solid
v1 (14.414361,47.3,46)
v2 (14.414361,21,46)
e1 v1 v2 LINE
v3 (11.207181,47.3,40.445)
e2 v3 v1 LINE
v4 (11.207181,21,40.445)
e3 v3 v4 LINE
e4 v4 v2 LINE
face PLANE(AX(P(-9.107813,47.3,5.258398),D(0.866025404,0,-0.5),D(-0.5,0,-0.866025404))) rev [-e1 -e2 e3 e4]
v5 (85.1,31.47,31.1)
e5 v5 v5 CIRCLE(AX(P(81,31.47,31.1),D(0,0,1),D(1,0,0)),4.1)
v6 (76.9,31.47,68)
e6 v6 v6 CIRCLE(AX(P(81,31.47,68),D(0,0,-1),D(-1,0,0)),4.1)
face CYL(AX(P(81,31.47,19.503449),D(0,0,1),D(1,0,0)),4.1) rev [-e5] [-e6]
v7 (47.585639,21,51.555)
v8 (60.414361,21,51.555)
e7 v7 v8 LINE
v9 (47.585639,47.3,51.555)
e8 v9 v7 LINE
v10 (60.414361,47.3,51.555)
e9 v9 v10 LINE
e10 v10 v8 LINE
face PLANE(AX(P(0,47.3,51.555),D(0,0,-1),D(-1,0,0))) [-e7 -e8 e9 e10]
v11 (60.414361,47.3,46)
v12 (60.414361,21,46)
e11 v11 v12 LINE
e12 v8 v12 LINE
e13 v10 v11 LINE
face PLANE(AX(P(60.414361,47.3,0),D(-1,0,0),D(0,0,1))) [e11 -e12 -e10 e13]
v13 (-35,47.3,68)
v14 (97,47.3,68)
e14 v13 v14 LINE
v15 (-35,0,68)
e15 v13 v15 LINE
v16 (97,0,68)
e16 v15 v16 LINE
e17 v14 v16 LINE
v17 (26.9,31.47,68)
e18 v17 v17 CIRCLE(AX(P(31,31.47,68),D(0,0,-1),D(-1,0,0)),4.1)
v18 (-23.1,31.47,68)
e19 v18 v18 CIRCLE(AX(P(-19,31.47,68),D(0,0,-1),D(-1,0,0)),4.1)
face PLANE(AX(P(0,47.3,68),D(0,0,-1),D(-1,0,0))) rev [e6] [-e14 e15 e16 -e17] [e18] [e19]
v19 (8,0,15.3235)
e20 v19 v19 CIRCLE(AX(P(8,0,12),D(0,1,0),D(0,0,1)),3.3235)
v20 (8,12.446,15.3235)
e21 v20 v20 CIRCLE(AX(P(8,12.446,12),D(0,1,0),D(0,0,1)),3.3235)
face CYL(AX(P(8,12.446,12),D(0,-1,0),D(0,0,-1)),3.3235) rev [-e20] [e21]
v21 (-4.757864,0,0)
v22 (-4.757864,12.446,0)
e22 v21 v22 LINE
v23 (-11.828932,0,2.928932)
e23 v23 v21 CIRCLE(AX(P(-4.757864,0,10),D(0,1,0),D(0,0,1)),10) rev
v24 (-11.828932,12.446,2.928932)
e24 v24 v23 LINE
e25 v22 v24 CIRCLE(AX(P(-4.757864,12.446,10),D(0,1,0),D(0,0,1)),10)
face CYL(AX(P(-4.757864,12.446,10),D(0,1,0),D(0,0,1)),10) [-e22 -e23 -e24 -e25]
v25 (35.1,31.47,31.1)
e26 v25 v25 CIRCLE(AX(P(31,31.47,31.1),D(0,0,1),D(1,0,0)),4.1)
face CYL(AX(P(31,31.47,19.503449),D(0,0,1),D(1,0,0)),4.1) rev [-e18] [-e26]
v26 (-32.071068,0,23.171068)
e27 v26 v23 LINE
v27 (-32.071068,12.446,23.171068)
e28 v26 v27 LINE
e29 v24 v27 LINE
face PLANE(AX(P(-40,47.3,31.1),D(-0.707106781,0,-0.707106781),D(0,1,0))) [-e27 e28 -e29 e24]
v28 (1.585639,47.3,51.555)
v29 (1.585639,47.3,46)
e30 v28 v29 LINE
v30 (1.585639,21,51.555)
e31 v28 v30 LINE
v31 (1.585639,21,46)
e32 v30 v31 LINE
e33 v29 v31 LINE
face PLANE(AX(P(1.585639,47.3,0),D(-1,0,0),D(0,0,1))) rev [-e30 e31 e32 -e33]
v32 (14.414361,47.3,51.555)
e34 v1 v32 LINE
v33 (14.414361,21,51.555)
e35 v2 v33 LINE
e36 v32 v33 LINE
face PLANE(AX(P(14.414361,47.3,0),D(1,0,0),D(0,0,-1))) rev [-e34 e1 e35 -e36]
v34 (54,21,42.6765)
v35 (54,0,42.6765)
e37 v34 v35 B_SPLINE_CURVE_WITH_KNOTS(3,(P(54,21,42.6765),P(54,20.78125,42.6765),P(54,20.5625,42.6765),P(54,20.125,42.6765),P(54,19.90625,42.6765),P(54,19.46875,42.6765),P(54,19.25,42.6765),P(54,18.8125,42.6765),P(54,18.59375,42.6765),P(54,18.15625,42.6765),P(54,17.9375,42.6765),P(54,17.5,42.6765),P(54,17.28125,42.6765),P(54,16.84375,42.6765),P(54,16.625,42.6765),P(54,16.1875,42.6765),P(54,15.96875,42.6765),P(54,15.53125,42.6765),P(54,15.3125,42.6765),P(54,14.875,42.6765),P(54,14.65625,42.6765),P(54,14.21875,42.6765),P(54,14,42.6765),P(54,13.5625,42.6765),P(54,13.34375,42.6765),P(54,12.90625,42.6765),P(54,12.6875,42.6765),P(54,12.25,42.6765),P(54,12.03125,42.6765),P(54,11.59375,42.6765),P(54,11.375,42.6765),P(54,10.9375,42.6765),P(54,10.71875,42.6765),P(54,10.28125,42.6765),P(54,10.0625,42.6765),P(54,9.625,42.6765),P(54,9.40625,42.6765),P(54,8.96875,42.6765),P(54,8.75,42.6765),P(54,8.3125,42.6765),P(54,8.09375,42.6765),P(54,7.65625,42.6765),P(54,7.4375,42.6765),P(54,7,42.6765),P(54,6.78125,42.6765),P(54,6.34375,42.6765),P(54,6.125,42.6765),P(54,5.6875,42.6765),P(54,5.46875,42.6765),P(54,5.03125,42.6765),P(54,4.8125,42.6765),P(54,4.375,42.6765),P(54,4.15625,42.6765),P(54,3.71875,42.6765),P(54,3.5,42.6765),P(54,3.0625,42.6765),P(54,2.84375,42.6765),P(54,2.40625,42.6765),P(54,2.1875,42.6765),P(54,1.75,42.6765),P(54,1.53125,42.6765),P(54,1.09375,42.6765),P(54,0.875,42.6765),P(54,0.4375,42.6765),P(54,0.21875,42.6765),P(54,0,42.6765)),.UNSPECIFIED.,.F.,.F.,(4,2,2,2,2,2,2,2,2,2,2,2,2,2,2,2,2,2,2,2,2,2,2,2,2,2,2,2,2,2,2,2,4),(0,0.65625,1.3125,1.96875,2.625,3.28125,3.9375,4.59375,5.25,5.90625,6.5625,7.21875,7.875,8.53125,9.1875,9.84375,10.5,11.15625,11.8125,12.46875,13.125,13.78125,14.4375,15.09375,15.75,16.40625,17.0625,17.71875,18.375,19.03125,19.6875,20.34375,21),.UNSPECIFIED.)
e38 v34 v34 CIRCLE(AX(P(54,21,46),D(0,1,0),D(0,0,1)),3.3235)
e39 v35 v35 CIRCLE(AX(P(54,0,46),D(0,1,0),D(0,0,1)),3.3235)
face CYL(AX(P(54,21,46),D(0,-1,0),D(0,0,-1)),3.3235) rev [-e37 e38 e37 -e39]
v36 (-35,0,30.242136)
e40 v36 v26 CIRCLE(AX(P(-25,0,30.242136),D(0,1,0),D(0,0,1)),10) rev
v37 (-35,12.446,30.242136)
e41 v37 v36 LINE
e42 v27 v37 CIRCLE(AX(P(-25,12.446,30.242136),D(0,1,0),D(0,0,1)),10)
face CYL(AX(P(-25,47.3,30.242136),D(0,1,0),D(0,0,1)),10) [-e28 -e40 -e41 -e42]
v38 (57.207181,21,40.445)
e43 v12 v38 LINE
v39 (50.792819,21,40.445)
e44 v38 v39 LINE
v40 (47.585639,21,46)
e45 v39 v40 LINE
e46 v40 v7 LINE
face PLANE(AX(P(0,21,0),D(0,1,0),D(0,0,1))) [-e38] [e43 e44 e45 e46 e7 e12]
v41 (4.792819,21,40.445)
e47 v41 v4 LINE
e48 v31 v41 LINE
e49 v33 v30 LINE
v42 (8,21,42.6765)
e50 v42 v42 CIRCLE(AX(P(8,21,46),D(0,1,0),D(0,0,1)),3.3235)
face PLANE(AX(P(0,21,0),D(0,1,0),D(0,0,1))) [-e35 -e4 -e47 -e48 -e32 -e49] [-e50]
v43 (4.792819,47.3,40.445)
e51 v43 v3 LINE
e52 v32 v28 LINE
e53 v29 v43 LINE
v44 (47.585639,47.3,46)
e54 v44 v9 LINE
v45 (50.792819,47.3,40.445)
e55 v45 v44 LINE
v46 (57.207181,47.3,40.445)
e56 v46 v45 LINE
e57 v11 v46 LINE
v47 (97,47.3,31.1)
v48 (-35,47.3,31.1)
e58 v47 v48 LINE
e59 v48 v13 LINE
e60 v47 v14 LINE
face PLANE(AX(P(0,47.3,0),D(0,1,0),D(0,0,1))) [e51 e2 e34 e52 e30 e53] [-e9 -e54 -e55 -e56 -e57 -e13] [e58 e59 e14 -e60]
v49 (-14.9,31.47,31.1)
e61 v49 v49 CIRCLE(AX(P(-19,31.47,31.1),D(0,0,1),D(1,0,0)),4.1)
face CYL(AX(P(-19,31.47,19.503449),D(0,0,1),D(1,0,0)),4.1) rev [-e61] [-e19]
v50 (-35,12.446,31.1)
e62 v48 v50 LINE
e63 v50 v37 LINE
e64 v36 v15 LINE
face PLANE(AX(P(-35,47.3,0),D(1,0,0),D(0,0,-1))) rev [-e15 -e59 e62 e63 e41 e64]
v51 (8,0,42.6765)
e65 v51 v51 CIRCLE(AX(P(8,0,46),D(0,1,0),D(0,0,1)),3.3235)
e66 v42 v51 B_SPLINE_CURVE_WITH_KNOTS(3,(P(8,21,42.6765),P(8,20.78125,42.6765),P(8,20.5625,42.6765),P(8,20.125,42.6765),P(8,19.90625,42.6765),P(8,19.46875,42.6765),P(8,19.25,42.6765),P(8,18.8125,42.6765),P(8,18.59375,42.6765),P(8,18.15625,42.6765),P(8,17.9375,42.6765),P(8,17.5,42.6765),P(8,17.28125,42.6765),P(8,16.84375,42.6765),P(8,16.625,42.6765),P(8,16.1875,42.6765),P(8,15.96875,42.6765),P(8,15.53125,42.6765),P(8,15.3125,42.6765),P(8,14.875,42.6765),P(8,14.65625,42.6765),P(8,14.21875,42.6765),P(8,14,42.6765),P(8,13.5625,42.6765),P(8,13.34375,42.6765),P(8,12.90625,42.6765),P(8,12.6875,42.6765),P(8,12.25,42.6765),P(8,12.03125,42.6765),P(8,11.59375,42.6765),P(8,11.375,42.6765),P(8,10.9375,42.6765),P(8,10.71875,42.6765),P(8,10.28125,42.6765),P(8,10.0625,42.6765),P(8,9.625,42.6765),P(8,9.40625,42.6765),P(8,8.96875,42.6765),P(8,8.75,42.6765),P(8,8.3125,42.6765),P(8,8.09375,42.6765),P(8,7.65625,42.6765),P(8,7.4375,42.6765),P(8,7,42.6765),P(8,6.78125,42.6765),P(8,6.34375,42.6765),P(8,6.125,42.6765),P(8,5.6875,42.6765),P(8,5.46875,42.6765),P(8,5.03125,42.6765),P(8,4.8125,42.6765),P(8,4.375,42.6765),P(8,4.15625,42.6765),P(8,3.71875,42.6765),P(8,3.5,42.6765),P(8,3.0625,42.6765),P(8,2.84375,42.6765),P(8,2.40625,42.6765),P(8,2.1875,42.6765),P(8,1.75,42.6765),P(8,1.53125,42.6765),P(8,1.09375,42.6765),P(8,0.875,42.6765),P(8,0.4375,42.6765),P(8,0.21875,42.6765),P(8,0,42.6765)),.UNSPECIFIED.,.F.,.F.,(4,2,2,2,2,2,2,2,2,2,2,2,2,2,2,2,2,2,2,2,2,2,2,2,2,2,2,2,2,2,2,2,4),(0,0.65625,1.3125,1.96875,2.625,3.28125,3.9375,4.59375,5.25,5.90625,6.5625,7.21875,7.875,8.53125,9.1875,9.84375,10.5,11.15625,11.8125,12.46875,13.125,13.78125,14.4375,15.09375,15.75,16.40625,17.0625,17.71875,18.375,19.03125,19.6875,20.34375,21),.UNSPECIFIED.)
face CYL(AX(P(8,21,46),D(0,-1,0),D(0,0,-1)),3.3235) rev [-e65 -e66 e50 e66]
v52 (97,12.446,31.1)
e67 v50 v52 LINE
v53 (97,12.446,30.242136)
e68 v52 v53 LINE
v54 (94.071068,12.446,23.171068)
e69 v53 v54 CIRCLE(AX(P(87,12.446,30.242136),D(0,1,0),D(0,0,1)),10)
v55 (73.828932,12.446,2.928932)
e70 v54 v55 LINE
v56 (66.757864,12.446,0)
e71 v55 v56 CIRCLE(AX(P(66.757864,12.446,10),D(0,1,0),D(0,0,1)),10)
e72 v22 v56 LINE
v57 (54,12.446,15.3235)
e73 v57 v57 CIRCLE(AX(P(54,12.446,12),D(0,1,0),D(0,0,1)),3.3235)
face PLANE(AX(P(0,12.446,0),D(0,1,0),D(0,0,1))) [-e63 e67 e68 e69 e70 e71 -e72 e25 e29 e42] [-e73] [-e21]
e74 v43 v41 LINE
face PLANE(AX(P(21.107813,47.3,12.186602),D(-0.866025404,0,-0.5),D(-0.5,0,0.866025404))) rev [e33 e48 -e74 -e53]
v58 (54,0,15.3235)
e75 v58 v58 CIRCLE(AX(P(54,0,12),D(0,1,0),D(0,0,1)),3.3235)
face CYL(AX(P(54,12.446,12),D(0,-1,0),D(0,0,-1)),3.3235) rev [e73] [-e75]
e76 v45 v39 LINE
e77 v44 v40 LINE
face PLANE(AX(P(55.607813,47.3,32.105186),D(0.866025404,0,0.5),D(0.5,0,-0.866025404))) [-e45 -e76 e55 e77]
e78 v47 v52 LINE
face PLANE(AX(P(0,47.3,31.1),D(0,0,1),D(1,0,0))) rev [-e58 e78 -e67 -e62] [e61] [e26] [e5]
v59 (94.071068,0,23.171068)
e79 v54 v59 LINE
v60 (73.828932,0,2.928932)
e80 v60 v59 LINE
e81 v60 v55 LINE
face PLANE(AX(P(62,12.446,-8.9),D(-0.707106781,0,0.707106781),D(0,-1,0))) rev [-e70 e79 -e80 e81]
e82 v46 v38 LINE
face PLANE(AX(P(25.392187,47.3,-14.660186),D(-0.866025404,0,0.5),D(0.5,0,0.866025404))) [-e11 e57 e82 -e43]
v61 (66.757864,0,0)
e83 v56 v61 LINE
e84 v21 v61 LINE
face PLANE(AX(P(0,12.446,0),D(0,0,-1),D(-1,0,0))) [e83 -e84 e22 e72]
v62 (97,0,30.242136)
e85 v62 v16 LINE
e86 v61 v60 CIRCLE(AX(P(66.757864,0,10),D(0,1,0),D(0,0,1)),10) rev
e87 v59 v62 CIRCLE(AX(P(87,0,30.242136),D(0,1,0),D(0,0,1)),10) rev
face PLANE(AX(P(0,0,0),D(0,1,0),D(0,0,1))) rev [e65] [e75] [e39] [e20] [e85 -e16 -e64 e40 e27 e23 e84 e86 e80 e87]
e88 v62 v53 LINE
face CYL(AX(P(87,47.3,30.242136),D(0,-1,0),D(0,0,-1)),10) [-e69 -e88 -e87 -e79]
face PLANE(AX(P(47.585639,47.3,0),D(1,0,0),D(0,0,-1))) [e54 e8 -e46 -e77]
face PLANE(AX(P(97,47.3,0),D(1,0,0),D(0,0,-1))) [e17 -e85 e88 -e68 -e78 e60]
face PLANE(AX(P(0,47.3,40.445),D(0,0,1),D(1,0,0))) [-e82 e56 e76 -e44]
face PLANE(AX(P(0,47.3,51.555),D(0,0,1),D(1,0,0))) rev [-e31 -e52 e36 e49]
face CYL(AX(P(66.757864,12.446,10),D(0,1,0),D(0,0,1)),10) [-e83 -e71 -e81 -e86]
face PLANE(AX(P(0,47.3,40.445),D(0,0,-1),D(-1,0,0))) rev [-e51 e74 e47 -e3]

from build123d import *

# Parameters (mm, degrees)
SKETCH1_W           = 62
SKETCH1_H           = 31.1
SKETCH1_R           = 3.3235
BOSS_EXTRUDE1_DEPTH = 12.446
SKETCH1_3_W         = 35
SKETCH1_3_H         = 36.9
SKETCH1_3_W_2       = 62
BOSS_EXTRUDE2_DEPTH = 47.3
SKETCH1_4_R         = 3.3235
BOSS_EXTRUDE3_DEPTH = 21
SKETCH2_R           = 4.1
CUT_EXTRUDE1_DEPTH  = 36.9
CHAMFER1_SIZE       = 40
FILLET3_R           = 10


with BuildPart() as part:
    # Sketch1 → Boss-Extrude1 (new body)
    with BuildSketch(Plane(origin=(0, 0, 0), x_dir=(1, 0, 0), z_dir=(0, 1, 0))):
        with Locations((31, -15.55)):
            Rectangle(SKETCH1_W, SKETCH1_H)
        with Locations(Location((8, -12, 0), (0, 0, 270))):
            Circle(SKETCH1_R, mode=Mode.SUBTRACT)
        with Locations(Location((54, -12, 0), (0, 0, 270))):
            Circle(SKETCH1_R, mode=Mode.SUBTRACT)
    extrude(amount=BOSS_EXTRUDE1_DEPTH)

    # Sketch1<3> → Boss-Extrude2 (add)
    # profile 1 of 3: a face of its own
    with BuildSketch(Plane(origin=(0, 0, 0), x_dir=(1, 0, 0), z_dir=(0, 1, 0))):
        with Locations((-17.5, -49.55)):
            Rectangle(SKETCH1_3_W, SKETCH1_3_H)
    # profile 2 of 3: a face of its own
    with BuildSketch(Plane(origin=(0, 0, 0), x_dir=(1, 0, 0), z_dir=(0, 1, 0))):
        with Locations((31, -49.55)):
            Rectangle(SKETCH1_3_W_2, SKETCH1_3_H)
        Polygon((1.585638509, -46), (4.792819255, -40.445), (11.207180745, -40.445), (14.414361491, -46), (14.414361491, -51.555), (11.207180745, -51.555), (4.792819255, -51.555), (1.585638509, -51.555), align=None, mode=Mode.SUBTRACT)
        Polygon((60.414361491, -46), (60.414361491, -51.555), (47.585638509, -51.555), (47.585638509, -46), (50.792819255, -40.445), (57.207180745, -40.445), align=None, mode=Mode.SUBTRACT)
    # profile 3 of 3: a face of its own
    with BuildSketch(Plane(origin=(0, 0, 0), x_dir=(1, 0, 0), z_dir=(0, 1, 0))):
        with Locations((79.5, -49.55)):
            Rectangle(SKETCH1_3_W, SKETCH1_3_H)
    extrude(amount=BOSS_EXTRUDE2_DEPTH)

    # Sketch1<4> → Boss-Extrude3 (add)
    # profile 1 of 2: a face of its own
    with BuildSketch(Plane(origin=(0, 0, 0), x_dir=(1, 0, 0), z_dir=(0, 1, 0))):
        Polygon((14.414361491, -46), (11.207180745, -40.445), (4.792819255, -40.445), (1.585638509, -46), (1.585638509, -51.555), (14.414361491, -51.555), align=None)
        with Locations(Location((8, -46, 0), (0, 0, 90))):
            Circle(SKETCH1_4_R, mode=Mode.SUBTRACT)
    # profile 2 of 2: a face of its own
    with BuildSketch(Plane(origin=(0, 0, 0), x_dir=(1, 0, 0), z_dir=(0, 1, 0))):
        Polygon((47.585638509, -51.555), (60.414361491, -51.555), (60.414361491, -46), (57.207180745, -40.445), (50.792819255, -40.445), (47.585638509, -46), align=None)
        with Locations(Location((54, -46, 0), (0, 0, 90))):
            Circle(SKETCH1_4_R, mode=Mode.SUBTRACT)
    extrude(amount=BOSS_EXTRUDE3_DEPTH)

    # Sketch2 → Cut-Extrude1 (cut)
    with BuildSketch(Plane(origin=(0, 0, 68), x_dir=(-1, 0, 0), z_dir=(0, 0, -1))):
        with Locations(Location((19, 31.47, 0), (0, 0, 180))):
            Circle(SKETCH2_R)
        with Locations(Location((-31, 31.47, 0), (0, 0, 180))):
            Circle(SKETCH2_R)
        with Locations(Location((-81, 31.47, 0), (0, 0, 180))):
            Circle(SKETCH2_R)
    extrude(amount=CUT_EXTRUDE1_DEPTH, mode=Mode.SUBTRACT)

    # Chamfer1
    # the kernel refuses this chamfer: 40 mm, written as the material it adds along each edge
    with BuildSketch(Plane(origin=(62, 0, 31.1), x_dir=(0.9996219169112968, 0, 0.02749587661058649), z_dir=(0, 1, 0))) as chamfer1_piece_1_section:
        Polygon((CHAMFER1_SIZE * 0.999621916911, CHAMFER1_SIZE * 0.0274958766106), (-CHAMFER1_SIZE * 0.0274958766106, CHAMFER1_SIZE * 0.999621916911), (0, 0), align=None)
    chamfer1_piece_1 = extrude(amount=12.446, mode=Mode.PRIVATE)
    chamfer1_piece_1 = split(chamfer1_piece_1, bisect_by=Plane(origin=(97, 6.223, 19.019433431), z_dir=(-1, 0, 0)), keep=Keep.TOP, mode=Mode.PRIVATE)
    chamfer1_piece_1 = split(chamfer1_piece_1, bisect_by=Plane(origin=(75.290949727, 6.223, 0), z_dir=(0, 0, 1)), keep=Keep.TOP, mode=Mode.PRIVATE)
    add(chamfer1_piece_1)
    with BuildSketch(Plane(origin=(0, 0, 31.1), x_dir=(-0.9996219169112968, 0, 0.027495876610586497), z_dir=(0, 1, 0))) as chamfer1_piece_2_section:
        Polygon((CHAMFER1_SIZE * 0.999621916911, -CHAMFER1_SIZE * 0.0274958766106), (-CHAMFER1_SIZE * 0.0274958766106, -CHAMFER1_SIZE * 0.999621916911), (0, 0), align=None)
    chamfer1_piece_2 = extrude(amount=12.446, mode=Mode.PRIVATE)
    chamfer1_piece_2 = split(chamfer1_piece_2, bisect_by=Plane(origin=(-35, 6.223, 19.019433431), z_dir=(1, 0, 0)), keep=Keep.TOP, mode=Mode.PRIVATE)
    chamfer1_piece_2 = split(chamfer1_piece_2, bisect_by=Plane(origin=(-13.290949727, 6.223, 0), z_dir=(0, 0, 1)), keep=Keep.TOP, mode=Mode.PRIVATE)
    add(chamfer1_piece_2)

    # Fillet3
    fillet3_edges = [part.edges().sort_by_distance(p)[0] for p in [
        (70.9, 6.223, 0),
        (97, 6.223, 26.1),
        (-35, 6.223, 26.1),
        (-8.9, 6.223, 0),
    ]]
    fillet(fillet3_edges, radius=FILLET3_R)


solid = part.part
